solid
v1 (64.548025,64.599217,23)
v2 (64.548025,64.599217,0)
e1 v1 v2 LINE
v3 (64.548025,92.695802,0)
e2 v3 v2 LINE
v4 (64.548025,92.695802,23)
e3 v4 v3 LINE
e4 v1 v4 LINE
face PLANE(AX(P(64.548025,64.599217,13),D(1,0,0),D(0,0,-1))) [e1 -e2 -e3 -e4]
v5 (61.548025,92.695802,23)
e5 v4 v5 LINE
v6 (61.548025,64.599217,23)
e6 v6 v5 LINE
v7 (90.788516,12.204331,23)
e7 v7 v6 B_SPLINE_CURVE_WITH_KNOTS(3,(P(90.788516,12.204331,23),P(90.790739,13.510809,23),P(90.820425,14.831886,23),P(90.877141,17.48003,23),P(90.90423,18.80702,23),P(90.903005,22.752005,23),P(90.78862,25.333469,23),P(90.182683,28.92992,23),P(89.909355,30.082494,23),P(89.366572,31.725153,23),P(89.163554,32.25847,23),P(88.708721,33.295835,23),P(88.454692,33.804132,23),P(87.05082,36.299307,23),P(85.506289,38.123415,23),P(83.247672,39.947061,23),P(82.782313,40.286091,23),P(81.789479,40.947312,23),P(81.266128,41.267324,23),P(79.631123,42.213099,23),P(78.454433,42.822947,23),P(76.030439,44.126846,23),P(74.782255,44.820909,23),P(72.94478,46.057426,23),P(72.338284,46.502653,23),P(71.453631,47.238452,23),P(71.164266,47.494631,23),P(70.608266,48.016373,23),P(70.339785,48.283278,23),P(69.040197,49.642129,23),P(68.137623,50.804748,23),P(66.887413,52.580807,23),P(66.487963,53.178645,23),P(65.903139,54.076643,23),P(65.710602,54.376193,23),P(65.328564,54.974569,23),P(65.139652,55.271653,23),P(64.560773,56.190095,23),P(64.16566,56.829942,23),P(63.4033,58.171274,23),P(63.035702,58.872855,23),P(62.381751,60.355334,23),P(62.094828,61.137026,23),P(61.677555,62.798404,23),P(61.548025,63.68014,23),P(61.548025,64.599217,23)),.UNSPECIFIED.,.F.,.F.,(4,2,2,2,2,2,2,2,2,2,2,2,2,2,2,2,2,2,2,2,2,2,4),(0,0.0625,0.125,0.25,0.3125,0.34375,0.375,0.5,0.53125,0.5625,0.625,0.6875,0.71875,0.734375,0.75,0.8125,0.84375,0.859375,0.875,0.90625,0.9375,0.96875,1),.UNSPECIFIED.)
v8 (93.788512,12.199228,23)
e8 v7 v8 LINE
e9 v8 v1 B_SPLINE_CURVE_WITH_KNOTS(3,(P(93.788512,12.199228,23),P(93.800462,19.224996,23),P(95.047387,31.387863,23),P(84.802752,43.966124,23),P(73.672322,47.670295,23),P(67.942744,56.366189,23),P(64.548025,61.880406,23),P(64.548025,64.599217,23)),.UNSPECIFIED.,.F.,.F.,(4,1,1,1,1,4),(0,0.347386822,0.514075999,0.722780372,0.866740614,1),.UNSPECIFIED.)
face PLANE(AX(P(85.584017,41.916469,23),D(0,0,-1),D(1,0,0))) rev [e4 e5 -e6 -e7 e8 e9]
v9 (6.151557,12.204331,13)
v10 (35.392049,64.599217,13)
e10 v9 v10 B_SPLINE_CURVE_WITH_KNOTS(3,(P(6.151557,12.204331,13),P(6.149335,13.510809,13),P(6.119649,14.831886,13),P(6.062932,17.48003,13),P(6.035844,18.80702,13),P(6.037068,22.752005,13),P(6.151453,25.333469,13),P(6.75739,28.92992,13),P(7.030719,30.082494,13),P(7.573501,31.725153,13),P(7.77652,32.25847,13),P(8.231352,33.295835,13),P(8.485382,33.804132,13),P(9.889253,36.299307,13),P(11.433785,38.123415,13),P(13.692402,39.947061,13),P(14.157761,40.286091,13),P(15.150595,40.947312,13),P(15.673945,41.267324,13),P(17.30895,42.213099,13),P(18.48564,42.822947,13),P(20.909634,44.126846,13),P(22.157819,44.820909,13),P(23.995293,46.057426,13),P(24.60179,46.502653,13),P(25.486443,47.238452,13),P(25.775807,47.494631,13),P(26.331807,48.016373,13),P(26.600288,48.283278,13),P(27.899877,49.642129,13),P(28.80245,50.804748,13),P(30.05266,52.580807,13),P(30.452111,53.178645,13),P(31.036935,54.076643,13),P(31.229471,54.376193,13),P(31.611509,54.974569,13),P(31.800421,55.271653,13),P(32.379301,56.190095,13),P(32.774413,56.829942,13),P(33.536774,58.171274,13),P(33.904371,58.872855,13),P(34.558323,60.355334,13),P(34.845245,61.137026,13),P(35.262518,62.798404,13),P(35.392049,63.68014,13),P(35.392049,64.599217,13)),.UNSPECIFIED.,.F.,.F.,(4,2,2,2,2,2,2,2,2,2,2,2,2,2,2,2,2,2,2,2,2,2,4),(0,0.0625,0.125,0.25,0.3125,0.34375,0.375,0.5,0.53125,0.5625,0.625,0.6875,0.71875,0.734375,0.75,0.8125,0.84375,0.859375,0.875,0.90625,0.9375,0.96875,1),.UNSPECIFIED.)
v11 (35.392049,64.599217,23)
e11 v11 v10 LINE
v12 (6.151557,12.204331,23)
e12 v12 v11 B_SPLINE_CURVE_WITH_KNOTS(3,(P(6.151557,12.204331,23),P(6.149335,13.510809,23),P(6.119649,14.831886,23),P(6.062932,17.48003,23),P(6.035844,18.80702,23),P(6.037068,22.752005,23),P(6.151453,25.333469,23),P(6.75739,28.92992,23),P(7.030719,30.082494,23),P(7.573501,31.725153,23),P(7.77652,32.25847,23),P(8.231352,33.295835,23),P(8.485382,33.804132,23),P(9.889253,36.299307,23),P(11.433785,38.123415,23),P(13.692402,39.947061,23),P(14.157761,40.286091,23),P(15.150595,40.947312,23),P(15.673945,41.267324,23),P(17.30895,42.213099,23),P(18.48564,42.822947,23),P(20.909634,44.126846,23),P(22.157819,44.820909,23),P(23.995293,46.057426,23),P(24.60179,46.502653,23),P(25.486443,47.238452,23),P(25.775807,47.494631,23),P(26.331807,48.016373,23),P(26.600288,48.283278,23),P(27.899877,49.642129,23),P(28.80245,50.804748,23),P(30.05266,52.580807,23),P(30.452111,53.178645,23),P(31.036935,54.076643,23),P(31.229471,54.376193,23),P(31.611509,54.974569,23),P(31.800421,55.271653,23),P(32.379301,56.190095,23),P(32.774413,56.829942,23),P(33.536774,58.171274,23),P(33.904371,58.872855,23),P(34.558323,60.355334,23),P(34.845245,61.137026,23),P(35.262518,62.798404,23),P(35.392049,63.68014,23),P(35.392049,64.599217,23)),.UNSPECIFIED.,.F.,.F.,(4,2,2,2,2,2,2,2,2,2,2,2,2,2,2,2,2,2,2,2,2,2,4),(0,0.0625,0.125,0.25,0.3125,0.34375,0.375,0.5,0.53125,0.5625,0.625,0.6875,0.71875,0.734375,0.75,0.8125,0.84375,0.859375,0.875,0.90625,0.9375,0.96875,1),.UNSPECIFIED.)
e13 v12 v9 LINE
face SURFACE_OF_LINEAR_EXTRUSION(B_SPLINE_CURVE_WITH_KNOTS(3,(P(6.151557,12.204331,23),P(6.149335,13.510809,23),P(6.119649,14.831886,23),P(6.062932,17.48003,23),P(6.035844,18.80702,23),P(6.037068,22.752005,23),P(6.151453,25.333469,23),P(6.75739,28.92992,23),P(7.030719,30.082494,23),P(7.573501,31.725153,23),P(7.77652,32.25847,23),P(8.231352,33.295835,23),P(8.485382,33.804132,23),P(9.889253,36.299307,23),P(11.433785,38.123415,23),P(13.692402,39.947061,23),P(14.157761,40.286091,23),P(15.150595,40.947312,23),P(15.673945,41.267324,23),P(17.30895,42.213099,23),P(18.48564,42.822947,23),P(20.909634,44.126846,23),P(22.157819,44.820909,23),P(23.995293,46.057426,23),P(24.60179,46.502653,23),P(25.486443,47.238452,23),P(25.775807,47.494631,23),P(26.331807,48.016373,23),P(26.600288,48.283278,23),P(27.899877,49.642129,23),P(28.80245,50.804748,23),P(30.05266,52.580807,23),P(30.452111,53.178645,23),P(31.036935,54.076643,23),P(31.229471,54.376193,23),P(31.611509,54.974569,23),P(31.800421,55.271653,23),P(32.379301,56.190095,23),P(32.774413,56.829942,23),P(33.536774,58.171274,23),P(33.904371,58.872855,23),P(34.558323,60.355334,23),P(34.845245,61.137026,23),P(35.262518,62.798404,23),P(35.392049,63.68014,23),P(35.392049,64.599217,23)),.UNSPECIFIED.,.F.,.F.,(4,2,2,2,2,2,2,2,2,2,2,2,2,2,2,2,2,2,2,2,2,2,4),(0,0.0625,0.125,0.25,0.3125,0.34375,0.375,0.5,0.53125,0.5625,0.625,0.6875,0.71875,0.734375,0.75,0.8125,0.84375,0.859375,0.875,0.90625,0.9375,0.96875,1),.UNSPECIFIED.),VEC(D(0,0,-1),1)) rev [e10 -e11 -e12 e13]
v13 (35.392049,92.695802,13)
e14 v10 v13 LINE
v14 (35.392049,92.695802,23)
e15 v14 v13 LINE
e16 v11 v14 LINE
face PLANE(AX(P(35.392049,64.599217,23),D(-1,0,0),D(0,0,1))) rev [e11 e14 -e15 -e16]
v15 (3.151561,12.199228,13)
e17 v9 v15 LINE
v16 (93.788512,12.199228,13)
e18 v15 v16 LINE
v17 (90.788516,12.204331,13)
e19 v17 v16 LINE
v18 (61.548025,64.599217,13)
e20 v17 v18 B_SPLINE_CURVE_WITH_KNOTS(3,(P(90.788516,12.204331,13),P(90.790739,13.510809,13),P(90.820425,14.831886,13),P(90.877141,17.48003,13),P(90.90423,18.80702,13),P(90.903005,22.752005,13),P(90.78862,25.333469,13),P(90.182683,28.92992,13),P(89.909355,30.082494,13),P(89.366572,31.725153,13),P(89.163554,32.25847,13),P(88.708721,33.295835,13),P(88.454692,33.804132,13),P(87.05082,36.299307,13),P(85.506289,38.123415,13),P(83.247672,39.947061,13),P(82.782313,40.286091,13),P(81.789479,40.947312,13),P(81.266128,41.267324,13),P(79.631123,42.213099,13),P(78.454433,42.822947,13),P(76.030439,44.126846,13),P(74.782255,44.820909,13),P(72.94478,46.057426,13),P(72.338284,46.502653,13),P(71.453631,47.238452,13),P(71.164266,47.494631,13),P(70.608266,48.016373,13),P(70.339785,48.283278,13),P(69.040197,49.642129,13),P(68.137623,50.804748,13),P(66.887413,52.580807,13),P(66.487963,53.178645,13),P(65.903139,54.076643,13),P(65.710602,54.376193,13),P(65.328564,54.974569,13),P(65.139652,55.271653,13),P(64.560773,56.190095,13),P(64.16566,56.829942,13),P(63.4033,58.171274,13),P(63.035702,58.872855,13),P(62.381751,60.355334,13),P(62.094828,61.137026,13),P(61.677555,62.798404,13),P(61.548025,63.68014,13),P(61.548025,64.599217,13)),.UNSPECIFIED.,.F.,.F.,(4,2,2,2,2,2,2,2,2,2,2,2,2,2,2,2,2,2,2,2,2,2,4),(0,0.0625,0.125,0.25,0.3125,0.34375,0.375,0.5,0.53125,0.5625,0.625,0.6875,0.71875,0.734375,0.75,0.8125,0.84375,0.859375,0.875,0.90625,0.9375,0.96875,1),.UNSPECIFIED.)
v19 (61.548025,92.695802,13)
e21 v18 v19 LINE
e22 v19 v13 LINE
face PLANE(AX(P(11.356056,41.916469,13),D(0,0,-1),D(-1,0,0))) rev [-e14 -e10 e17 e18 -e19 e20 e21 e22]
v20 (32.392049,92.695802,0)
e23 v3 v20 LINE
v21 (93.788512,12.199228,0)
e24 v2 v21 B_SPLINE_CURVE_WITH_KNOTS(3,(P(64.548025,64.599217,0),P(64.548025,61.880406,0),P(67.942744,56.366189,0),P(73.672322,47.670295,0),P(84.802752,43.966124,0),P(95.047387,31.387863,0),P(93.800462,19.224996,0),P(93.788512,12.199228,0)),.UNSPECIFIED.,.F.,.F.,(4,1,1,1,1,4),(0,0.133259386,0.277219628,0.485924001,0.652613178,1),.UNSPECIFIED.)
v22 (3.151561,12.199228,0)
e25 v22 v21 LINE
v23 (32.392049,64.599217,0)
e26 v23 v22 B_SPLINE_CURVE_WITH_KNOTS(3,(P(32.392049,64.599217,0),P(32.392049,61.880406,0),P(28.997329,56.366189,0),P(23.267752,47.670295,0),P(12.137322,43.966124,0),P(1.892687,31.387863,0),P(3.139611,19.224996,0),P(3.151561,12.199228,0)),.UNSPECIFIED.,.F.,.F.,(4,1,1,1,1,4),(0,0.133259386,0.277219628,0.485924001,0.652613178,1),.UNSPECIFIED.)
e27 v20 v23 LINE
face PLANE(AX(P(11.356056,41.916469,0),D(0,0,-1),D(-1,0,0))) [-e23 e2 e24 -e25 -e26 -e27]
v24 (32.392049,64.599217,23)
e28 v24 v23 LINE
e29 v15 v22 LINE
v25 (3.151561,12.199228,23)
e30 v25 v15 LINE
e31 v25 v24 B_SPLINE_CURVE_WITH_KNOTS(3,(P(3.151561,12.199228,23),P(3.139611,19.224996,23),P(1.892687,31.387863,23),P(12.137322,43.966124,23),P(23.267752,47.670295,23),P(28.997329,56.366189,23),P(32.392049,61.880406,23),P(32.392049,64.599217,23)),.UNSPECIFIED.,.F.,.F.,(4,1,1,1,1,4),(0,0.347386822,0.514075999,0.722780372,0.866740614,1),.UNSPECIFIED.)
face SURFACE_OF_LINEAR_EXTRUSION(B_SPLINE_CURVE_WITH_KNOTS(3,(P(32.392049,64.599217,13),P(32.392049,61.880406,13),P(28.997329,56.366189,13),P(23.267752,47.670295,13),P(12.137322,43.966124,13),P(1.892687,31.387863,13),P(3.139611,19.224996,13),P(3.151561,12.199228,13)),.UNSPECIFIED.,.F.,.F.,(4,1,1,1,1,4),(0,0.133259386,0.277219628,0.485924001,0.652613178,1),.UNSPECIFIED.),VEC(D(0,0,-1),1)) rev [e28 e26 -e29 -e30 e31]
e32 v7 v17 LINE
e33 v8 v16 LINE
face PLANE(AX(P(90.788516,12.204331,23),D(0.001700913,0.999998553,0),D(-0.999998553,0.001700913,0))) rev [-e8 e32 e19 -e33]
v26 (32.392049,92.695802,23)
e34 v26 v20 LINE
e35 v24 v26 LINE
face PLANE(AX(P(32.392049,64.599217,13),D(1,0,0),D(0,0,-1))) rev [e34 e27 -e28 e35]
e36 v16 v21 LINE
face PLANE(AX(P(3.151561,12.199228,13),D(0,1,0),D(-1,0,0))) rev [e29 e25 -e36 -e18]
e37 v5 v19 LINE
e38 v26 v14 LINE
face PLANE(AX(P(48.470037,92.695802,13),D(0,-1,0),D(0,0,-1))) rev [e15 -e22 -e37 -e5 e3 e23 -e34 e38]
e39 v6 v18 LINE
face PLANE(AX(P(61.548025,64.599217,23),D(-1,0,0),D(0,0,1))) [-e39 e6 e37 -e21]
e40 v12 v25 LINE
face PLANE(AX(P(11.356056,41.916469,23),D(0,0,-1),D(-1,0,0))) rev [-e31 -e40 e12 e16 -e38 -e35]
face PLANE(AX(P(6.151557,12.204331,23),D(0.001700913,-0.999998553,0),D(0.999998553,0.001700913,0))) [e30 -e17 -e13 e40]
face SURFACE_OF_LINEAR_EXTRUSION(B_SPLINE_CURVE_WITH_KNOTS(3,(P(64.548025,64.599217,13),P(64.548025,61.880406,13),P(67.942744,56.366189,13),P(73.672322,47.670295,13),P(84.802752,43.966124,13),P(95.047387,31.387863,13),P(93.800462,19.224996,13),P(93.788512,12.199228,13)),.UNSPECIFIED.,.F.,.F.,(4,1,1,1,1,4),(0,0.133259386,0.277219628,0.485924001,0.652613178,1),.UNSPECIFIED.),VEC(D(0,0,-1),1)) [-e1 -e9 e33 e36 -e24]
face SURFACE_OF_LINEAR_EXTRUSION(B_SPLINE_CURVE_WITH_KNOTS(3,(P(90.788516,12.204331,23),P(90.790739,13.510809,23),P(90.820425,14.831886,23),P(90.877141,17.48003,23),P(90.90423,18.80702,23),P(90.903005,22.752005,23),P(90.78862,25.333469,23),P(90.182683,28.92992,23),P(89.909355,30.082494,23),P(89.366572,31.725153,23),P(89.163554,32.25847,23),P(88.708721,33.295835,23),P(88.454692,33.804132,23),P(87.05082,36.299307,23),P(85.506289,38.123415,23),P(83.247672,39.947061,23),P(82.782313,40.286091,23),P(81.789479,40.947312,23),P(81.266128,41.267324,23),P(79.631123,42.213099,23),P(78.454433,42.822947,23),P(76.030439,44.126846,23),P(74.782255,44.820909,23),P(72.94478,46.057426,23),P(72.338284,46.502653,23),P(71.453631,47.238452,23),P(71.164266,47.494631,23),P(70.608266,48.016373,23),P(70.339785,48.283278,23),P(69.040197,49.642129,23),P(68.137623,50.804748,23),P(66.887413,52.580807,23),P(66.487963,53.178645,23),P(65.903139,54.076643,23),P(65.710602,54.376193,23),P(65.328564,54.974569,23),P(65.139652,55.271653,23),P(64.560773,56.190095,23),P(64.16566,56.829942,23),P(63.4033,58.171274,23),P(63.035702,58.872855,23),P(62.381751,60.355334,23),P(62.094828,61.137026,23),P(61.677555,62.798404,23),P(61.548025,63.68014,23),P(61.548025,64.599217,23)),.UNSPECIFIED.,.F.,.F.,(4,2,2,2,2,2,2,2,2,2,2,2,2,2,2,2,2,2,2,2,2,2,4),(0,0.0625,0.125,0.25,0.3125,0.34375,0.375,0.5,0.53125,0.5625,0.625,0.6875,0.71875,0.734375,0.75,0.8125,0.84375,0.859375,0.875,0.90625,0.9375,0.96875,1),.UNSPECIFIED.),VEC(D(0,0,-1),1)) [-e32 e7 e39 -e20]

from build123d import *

# Parameters (mm, degrees)
ESTRUSIONE_ESTRUSIONE1_DEPTH = 13
ESTRUSIONE_SOTTILE5_DEPTH    = 10


# Read off the part's stored shape, not the designer's step: Estrusione-Sottile5
with BuildPart() as part:
    # Schizzo1 → Estrusione-Estrusione1 (new body)
    with BuildSketch(Plane.XY):
        with BuildLine():
            Line((32.3920487, 64.599216546), (32.3920487, 92.695802437))
            Line((32.3920487, 92.695802437), (48.470036729, 92.695802437))
            Line((48.470036729, 92.695802437), (48.470036729, 12.199228267))
            Line((48.470036729, 12.199228267), (3.151561413, 12.199228267))
            add(Edge.make_bspline(
                [(3.151561413, 12.199228267), (3.139611177, 19.224996267), (1.892686637, 31.387863298), (12.137321926, 43.966124148), (23.267751598, 47.670295467), (28.997328985, 56.366188951), (32.3920487, 61.880405589), (32.3920487, 64.599216546)],
                knots=[0, 0, 0, 0, 0.347386822, 0.514075999, 0.722780372, 0.866740614, 1, 1, 1, 1], degree=3))
        make_face()
    estrusione_estrusione1 = extrude(amount=ESTRUSIONE_ESTRUSIONE1_DEPTH)

    # Estrusione-Sottile5 outline → Estrusione-Sottile5 (add)
    with BuildSketch(Plane.XY.offset(13)):
        with BuildLine():
            Line((32.3920487, 92.695802437), (32.3920487, 64.599216546))
            add(Edge.make_bspline(
                [(32.3920487, 64.599216546), (32.3920487, 61.880405589), (28.997328985, 56.366188951), (23.267751598, 47.670295467), (12.137321926, 43.966124148), (1.892686637, 31.387863298), (3.139611177, 19.224996267), (3.151561413, 12.199228267)],
                knots=[0, 0, 0, 0, 0.133259386, 0.277219628, 0.485924001, 0.652613178, 1, 1, 1, 1], degree=3))
            Line((3.151561413, 12.199228267), (6.151557074, 12.204331005))
            add(Edge.make_bspline(
                [(6.151557074, 12.204331005), (6.149334866, 13.510808651), (6.119648943, 14.831885644), (6.06293225, 17.480029501), (6.03584378, 18.807019929), (6.037068448, 22.752005394), (6.151453161, 25.333469119), (6.757390346, 28.929919641), (7.030718923, 30.082494468), (7.57350109, 31.725152792), (7.776519692, 32.258469787), (8.231352372, 33.295835374), (8.485381605, 33.804131964), (9.889253187, 36.299307042), (11.433784909, 38.123415419), (13.69240187, 39.947060574), (14.157760625, 40.286091152), (15.150594798, 40.947311626), (15.673944983, 41.267323739), (17.308950011, 42.213099328), (18.485640453, 42.822946504), (20.909634026, 44.126845944), (22.157818902, 44.820909202), (23.995293063, 46.057426343), (24.601789725, 46.502652624), (25.48644282, 47.23845245), (25.775807333, 47.494631032), (26.331807302, 48.016372792), (26.600288227, 48.283277702), (27.899876834, 49.642128534), (28.802450288, 50.804747978), (30.05266046, 52.580806918), (30.452110657, 53.178644998), (31.036934657, 54.076643069), (31.229471218, 54.376192918), (31.61150898, 54.974569074), (31.800421327, 55.271652753), (32.379300522, 56.190094836), (32.774413439, 56.829941685), (33.536773588, 58.171274416), (33.90437134, 58.872854876), (34.558322607, 60.355334084), (34.845244987, 61.13702646), (35.262518462, 62.798404364), (35.3920487, 63.680139971), (35.3920487, 64.599216546)],
                knots=[0, 0, 0, 0, 0.0625, 0.0625, 0.125, 0.125, 0.25, 0.25, 0.3125, 0.3125, 0.34375, 0.34375, 0.375, 0.375, 0.5, 0.5, 0.53125, 0.53125, 0.5625, 0.5625, 0.625, 0.625, 0.6875, 0.6875, 0.71875, 0.71875, 0.734375, 0.734375, 0.75, 0.75, 0.8125, 0.8125, 0.84375, 0.84375, 0.859375, 0.859375, 0.875, 0.875, 0.90625, 0.90625, 0.9375, 0.9375, 0.96875, 0.96875, 1, 1, 1, 1], degree=3))
            Line((35.3920487, 64.599216546), (35.3920487, 92.695802437))
            Line((35.3920487, 92.695802437), (32.3920487, 92.695802437))
        make_face()
    estrusione_sottile5 = extrude(amount=ESTRUSIONE_SOTTILE5_DEPTH)

    # Specchia1: Estrusione-Estrusione1, Estrusione-Sottile5 across plane
    add(estrusione_estrusione1.mirror(Plane(origin=(48.470036729, 12.199228267, 13), x_dir=(0, 0, 1), z_dir=(-1, 0, 0))))
    add(estrusione_sottile5.mirror(Plane(origin=(48.470036729, 12.199228267, 13), x_dir=(0, 0, 1), z_dir=(-1, 0, 0))))


solid = part.part
